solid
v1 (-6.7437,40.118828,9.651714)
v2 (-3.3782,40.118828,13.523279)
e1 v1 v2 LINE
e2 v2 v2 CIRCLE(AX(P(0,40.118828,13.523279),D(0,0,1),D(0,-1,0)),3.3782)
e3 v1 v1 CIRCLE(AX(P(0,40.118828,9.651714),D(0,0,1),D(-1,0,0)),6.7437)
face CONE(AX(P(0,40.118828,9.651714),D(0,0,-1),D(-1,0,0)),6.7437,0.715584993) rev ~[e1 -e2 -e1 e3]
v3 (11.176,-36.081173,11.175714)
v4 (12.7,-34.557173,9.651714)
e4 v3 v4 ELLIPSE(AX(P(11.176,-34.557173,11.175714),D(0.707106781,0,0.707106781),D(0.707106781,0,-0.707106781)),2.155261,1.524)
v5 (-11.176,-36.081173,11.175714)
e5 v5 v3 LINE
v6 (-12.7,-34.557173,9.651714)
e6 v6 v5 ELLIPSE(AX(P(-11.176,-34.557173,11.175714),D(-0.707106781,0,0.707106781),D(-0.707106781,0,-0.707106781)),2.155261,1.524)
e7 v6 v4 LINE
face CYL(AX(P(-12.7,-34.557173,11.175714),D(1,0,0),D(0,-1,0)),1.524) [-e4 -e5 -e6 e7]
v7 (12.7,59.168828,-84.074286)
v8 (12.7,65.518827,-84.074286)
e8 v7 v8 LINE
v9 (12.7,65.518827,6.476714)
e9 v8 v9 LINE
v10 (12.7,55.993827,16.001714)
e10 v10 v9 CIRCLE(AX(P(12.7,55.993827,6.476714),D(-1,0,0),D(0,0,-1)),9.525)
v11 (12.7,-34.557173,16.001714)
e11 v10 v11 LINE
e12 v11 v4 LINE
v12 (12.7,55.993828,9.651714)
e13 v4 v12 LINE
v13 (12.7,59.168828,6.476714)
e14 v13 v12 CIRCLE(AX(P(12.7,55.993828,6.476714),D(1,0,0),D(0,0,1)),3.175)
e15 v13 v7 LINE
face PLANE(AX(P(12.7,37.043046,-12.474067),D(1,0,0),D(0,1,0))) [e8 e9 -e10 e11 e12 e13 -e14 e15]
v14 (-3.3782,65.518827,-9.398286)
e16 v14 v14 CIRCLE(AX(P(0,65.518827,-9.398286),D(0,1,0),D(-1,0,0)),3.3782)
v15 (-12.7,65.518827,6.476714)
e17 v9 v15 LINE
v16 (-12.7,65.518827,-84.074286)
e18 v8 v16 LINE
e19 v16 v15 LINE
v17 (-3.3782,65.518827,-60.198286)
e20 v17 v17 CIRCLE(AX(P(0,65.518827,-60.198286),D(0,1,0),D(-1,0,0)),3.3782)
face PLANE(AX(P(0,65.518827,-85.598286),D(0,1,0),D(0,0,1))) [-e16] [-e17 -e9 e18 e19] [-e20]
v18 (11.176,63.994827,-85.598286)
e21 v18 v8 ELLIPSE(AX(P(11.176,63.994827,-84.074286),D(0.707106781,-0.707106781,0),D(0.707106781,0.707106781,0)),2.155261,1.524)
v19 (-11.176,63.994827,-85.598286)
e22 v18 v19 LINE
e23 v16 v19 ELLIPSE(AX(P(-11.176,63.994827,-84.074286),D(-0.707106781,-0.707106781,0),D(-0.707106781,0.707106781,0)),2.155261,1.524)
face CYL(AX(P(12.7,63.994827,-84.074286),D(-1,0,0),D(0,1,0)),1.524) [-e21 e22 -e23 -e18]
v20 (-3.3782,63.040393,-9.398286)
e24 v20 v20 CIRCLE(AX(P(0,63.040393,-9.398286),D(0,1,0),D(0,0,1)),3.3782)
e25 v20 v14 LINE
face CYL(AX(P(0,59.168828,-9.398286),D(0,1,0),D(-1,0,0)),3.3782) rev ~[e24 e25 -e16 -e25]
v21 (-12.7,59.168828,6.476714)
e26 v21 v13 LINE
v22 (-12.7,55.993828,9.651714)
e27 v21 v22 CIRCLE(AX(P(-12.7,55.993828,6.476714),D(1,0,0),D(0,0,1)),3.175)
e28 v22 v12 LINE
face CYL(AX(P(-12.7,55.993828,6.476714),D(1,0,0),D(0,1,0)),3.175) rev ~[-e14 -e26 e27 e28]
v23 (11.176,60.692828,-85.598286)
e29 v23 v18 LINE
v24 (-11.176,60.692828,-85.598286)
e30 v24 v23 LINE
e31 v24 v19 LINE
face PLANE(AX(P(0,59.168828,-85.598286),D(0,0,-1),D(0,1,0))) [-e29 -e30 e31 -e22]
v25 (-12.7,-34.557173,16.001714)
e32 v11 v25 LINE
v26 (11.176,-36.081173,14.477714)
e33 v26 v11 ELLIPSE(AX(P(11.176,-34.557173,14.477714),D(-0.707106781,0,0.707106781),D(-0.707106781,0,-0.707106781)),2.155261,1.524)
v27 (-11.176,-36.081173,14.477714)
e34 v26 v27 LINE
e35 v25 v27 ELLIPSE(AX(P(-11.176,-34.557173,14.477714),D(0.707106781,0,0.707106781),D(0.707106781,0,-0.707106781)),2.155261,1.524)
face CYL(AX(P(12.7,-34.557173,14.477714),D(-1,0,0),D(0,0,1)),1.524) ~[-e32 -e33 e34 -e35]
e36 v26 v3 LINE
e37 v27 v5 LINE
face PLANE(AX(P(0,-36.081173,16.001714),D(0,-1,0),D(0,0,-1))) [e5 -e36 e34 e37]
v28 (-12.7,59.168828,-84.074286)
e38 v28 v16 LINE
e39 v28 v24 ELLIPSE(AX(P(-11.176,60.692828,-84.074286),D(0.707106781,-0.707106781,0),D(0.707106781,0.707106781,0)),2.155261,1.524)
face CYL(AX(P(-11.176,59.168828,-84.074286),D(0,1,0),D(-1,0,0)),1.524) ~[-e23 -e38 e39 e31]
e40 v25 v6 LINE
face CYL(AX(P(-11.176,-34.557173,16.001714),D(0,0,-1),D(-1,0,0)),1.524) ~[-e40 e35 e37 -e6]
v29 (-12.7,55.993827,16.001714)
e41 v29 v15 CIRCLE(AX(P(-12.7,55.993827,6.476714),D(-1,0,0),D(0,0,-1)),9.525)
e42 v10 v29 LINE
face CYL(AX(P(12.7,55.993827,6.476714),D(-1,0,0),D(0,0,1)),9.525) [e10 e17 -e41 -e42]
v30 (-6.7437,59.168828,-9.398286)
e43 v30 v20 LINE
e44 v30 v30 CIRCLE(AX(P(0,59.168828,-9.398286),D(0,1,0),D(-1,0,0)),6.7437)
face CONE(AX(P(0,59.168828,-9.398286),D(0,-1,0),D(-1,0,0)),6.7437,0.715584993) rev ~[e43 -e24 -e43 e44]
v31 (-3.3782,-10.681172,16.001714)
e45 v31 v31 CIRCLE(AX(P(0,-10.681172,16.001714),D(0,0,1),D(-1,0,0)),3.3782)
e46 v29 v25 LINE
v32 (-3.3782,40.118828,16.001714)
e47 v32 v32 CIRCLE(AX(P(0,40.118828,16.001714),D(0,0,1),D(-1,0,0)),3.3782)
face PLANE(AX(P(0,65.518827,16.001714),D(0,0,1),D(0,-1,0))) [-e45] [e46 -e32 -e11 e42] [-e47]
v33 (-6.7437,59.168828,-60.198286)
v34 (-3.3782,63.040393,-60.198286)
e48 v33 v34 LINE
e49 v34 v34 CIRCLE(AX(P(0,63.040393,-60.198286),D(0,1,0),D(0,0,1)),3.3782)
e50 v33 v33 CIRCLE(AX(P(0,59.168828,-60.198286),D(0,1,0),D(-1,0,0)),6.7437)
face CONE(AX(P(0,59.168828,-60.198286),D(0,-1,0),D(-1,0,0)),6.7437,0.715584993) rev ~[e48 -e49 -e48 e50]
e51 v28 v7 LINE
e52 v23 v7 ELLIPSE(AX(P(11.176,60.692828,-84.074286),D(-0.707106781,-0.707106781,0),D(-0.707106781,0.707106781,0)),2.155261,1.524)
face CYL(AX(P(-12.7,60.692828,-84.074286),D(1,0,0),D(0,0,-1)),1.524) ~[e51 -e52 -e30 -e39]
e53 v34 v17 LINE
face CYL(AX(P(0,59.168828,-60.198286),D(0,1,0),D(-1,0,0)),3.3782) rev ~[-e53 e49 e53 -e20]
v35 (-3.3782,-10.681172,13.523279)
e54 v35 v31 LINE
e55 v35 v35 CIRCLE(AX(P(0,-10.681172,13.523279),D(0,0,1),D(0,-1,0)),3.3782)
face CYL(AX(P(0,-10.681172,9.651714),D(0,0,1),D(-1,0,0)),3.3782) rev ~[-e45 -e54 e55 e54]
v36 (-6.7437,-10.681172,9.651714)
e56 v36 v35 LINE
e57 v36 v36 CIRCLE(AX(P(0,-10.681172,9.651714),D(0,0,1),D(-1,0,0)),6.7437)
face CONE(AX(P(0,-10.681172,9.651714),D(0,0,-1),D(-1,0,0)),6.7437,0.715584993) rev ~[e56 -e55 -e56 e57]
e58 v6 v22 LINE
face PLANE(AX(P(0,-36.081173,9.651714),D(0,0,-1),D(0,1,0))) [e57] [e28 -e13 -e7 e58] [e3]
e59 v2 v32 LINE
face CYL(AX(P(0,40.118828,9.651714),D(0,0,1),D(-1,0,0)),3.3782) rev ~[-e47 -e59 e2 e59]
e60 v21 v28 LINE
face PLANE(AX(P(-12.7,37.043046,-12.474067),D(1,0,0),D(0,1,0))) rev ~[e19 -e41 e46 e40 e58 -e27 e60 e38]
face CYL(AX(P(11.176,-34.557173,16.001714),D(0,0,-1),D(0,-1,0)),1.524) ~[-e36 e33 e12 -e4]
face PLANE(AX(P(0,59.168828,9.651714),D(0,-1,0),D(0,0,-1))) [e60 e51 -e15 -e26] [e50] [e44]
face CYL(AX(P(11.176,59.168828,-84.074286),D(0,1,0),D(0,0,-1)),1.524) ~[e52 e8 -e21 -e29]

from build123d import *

# Parameters (mm, degrees)
F1_DEPTH       = 12.7
F3_D           = 6.7564
F3_CSINK_D     = 13.4874
F3_CSINK_ANGLE = 82
F5_D           = 6.7564
F5_CSINK_D     = 13.4874
F5_CSINK_ANGLE = 82
F6_R           = 3.175
F7_R           = 9.525
F8_R           = 1.524


with BuildPart() as f1:
    # F0 (on Right) → F1 (new body, symmetric)
    with BuildSketch(Plane.YZ):
        Polygon((-36.0811725259, 16.0017143935), (-36.0811725259, 9.6517140046), (59.1688280165, 9.6517140046), (59.1688280165, -85.5982856065), (65.5188274741, -85.5982856065), (65.5188274741, 16.0017143935), align=None)
    extrude(amount=F1_DEPTH, both=True)

    # F3 (through all)
    with Locations(Plane.XZ.offset(-59.1688280165)):
        with Locations((0, -9.3982859954), (0, -60.1982859954)):
            CounterSinkHole(F3_D / 2, F3_CSINK_D / 2, counter_sink_angle=F3_CSINK_ANGLE)

    # F5 (through all)
    with Locations(Plane(origin=(0, 0, 9.6517140046), x_dir=(1, 0, 0), z_dir=(0, 0, -1))):
        with Locations((0, 10.6811719835), (0, -40.1188280165)):
            CounterSinkHole(F5_D / 2, F5_CSINK_D / 2, counter_sink_angle=F5_CSINK_ANGLE)

    # F6
    f6_edges = [f1.edges().sort_by_distance(p)[0] for p in [
        (0, 59.168828, 9.651714),
    ]]
    fillet(f6_edges, radius=F6_R)

    # F7
    f7_edges = [f1.edges().sort_by_distance(p)[0] for p in [
        (0, 65.518827, 16.001714),
    ]]
    fillet(f7_edges, radius=F7_R)

    # F8
    f8_edges = [f1.edges().sort_by_distance(p)[0] for p in [
        (12.7, 62.343828, -85.598286),
        (12.7, -36.081173, 12.826714),
        (-12.7, -36.081173, 12.826714),
        (-12.7, 62.343828, -85.598286),
        (0, 65.518827, -85.598286),
        (0, -36.081173, 16.001714),
        (0, -36.081173, 9.651714),
        (0, 59.168828, -85.598286),
    ]]
    fillet(f8_edges, radius=F8_R)


solid = f1.part
